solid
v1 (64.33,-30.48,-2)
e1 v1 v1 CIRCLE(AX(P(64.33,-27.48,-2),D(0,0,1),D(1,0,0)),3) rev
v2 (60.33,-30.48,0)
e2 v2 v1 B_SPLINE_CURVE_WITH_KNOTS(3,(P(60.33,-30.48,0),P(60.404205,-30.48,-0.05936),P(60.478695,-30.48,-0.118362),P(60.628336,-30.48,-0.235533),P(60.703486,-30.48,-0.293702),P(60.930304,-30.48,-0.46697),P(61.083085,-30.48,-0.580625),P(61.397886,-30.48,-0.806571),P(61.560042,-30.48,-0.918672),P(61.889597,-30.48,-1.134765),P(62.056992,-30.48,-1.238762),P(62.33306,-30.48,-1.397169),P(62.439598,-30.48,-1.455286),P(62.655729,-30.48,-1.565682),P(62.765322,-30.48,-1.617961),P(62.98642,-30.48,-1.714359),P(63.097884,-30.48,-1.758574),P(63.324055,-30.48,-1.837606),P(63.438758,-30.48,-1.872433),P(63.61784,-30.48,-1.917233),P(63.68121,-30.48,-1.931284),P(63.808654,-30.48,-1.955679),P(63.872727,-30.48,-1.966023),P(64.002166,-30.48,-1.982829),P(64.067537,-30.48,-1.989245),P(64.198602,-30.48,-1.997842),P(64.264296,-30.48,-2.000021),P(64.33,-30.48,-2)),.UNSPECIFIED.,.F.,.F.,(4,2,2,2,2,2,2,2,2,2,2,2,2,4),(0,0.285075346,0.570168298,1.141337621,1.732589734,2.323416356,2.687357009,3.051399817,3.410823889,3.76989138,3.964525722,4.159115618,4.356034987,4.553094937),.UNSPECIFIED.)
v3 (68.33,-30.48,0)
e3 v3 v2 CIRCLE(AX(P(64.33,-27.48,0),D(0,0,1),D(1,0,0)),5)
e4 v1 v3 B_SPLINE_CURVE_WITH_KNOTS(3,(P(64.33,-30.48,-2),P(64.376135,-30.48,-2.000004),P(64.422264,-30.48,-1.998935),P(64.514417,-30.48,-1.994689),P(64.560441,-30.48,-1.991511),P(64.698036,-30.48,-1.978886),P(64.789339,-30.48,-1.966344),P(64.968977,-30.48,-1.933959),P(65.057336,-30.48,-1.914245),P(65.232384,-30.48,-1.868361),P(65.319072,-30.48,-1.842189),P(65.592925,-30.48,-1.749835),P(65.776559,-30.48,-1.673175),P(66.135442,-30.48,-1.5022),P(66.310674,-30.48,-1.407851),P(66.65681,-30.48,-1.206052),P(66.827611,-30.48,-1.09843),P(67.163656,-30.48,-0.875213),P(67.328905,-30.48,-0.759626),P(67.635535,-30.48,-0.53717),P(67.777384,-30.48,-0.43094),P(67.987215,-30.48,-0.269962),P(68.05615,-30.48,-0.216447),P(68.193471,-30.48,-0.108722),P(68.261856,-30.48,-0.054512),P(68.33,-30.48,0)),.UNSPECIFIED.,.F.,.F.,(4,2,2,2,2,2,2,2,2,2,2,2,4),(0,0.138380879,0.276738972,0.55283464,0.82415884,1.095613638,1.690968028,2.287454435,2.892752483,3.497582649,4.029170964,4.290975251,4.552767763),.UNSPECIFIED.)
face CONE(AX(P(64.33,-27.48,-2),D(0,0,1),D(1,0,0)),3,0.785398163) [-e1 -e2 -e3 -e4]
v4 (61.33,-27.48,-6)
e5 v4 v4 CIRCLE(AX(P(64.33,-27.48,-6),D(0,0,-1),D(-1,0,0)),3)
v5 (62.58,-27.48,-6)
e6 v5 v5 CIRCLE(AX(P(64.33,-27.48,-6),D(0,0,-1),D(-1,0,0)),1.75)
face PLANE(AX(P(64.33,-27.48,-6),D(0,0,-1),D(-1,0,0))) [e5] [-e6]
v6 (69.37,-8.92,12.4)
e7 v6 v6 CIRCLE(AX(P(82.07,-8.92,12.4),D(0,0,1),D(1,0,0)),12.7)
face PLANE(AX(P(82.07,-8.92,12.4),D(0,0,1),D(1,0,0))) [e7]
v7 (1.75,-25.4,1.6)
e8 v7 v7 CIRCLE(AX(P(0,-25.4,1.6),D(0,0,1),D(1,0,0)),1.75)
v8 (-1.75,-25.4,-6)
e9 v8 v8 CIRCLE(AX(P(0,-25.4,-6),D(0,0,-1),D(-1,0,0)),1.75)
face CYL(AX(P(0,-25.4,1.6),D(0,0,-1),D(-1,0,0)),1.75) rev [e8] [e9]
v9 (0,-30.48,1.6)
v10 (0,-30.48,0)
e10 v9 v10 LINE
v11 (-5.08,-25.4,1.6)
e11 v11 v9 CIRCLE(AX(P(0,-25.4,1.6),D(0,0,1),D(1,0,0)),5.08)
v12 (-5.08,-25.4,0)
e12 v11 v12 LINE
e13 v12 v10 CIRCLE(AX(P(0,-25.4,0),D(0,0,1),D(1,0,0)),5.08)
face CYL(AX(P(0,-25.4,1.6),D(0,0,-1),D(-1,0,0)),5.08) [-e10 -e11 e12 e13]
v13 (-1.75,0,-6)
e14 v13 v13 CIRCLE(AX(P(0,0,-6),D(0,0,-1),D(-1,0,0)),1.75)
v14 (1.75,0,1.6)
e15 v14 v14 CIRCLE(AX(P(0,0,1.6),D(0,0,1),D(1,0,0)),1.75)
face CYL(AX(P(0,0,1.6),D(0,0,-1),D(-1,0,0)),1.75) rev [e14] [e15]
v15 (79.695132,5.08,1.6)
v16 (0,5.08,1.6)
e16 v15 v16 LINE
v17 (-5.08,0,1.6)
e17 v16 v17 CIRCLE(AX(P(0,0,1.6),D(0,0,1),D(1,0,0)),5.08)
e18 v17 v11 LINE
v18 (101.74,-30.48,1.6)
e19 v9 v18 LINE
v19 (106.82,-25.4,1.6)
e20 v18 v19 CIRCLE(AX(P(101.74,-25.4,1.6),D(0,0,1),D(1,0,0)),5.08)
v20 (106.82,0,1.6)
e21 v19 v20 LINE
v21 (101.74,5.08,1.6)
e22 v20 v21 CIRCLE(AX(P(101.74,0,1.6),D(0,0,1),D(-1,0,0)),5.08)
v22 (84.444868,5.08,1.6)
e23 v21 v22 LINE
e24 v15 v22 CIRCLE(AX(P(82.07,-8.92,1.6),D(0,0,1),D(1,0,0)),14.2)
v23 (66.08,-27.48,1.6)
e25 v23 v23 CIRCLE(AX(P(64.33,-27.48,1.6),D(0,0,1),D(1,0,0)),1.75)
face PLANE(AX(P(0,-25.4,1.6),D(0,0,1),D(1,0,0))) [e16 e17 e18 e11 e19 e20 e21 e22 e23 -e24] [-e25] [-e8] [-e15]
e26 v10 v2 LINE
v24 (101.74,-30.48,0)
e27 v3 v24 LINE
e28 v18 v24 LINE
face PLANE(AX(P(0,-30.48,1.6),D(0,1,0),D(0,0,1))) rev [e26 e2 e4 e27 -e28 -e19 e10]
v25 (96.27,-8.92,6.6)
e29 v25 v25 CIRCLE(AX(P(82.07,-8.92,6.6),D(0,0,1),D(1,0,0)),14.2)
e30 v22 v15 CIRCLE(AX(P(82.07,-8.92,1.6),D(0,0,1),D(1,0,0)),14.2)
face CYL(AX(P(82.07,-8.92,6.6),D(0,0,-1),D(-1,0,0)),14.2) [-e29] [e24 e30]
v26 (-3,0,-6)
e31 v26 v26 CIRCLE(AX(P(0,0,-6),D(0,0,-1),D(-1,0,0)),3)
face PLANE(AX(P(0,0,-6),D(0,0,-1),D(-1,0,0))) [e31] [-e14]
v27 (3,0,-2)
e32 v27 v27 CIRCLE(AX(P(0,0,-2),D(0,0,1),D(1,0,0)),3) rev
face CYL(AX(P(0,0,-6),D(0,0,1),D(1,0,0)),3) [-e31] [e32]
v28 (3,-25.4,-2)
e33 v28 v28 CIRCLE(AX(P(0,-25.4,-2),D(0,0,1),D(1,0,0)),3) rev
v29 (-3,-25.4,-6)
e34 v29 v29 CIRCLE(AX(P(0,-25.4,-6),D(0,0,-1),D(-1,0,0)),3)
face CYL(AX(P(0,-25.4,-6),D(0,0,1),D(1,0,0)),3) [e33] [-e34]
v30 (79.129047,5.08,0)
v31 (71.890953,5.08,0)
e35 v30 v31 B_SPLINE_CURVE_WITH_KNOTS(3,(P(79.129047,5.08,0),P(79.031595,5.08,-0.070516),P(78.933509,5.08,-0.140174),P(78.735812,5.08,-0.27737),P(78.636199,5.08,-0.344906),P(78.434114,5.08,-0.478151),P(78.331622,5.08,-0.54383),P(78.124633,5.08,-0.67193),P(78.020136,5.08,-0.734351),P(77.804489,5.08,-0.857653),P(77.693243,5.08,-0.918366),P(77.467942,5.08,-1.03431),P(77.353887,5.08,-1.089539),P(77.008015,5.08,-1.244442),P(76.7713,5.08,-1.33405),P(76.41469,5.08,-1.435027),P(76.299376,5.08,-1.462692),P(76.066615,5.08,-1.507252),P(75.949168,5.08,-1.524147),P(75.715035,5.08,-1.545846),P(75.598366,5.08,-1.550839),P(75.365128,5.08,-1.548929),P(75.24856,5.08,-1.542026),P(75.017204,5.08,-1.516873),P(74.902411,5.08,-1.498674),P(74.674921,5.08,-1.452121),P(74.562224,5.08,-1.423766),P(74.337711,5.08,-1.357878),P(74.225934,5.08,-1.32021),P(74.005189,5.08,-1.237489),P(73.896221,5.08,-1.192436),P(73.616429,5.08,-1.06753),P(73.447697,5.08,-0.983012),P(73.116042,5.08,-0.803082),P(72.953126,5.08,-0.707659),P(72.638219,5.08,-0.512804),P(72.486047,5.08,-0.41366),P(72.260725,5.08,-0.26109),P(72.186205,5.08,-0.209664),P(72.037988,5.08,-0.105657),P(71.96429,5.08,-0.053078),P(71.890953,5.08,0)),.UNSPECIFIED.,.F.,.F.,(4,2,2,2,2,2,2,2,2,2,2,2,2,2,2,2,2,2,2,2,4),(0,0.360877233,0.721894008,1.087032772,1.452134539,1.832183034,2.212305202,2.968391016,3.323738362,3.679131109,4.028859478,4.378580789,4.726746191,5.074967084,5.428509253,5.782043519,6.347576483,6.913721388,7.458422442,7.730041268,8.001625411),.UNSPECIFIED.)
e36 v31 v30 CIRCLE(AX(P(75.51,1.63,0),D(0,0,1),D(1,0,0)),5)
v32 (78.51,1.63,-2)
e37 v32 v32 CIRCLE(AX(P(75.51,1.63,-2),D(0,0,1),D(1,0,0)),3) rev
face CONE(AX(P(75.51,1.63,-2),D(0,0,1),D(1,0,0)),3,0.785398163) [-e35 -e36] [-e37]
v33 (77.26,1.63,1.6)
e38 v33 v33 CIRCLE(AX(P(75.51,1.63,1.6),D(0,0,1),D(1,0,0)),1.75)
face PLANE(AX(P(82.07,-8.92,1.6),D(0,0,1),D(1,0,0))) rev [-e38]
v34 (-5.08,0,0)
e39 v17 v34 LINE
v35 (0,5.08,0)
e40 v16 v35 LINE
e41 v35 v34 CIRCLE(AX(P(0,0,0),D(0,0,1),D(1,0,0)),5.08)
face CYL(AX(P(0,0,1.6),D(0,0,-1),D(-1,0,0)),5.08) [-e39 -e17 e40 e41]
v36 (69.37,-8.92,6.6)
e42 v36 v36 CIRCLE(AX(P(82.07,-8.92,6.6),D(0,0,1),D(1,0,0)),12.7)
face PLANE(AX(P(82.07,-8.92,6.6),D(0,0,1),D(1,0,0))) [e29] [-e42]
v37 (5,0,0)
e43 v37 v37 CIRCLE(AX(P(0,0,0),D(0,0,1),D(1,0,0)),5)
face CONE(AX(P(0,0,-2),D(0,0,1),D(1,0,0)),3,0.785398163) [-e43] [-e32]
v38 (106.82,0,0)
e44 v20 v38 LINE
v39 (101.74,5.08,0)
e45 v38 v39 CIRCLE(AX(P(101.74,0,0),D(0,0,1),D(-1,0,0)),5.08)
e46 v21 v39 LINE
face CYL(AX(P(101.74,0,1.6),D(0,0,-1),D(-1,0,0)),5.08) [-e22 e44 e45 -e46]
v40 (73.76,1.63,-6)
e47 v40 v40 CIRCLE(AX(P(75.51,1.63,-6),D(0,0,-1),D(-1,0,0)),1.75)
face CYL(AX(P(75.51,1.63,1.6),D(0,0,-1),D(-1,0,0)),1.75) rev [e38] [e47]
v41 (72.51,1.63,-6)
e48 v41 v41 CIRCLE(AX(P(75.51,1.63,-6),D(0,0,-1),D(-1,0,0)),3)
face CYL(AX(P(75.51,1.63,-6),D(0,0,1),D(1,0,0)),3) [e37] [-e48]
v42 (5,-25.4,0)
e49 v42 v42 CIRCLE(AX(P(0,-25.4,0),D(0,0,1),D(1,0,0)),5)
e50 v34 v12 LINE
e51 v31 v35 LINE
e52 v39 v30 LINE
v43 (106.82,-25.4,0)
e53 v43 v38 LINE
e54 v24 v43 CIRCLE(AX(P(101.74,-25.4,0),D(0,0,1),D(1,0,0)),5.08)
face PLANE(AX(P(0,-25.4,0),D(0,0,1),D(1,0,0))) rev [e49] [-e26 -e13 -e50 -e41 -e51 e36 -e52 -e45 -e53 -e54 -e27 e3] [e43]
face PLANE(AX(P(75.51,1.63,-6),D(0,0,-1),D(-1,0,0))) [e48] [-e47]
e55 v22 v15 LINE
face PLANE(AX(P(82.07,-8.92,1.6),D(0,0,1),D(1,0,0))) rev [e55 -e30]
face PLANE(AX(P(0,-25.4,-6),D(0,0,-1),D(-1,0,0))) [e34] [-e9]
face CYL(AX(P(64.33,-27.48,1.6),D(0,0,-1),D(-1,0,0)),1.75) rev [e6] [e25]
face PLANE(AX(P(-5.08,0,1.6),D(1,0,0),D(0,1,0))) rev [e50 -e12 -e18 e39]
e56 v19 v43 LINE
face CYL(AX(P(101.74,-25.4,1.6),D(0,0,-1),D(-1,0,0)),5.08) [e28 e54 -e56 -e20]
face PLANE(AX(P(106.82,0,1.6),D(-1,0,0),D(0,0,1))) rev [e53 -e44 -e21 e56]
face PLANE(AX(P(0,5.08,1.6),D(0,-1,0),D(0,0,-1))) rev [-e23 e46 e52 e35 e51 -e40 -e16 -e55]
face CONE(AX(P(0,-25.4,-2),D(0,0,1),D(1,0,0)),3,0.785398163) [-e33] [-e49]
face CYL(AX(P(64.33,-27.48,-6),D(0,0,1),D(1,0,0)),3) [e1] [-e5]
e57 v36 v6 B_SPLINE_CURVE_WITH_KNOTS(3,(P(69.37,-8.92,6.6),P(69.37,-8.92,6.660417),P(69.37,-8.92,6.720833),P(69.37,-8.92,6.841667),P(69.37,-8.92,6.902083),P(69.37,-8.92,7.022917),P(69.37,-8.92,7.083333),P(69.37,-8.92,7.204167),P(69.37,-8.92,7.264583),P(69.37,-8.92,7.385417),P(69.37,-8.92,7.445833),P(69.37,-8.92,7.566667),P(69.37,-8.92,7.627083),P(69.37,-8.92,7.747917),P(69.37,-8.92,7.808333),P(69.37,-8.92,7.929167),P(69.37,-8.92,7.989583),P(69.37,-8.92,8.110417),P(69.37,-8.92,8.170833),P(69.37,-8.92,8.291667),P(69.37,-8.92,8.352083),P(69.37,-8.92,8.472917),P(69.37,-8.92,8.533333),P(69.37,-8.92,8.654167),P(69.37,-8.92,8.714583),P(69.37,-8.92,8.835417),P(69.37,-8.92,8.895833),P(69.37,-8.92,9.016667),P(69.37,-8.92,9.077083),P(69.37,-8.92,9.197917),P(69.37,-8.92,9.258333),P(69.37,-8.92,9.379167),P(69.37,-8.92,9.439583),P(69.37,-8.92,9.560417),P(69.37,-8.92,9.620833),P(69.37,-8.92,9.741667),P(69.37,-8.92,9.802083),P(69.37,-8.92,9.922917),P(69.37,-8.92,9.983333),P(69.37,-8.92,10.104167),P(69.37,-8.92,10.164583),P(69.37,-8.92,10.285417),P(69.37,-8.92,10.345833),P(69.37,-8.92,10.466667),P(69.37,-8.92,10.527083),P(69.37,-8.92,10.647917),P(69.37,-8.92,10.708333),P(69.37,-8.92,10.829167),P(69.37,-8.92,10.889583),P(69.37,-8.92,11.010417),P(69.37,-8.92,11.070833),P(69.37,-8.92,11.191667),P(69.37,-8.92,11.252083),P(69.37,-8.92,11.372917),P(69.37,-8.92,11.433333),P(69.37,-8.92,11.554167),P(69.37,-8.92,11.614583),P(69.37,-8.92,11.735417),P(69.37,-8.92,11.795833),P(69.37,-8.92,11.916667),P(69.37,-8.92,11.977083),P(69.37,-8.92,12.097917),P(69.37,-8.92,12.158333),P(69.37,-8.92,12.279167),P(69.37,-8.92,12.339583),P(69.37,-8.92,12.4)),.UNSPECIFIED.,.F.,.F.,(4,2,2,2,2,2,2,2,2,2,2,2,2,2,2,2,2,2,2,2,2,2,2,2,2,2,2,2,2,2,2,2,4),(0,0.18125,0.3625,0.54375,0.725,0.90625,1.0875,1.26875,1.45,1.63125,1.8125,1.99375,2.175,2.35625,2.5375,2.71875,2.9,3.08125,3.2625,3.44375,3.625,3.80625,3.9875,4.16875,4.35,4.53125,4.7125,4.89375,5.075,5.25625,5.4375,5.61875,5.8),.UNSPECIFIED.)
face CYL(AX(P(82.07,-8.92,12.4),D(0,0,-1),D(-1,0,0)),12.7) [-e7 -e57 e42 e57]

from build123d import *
from build123d.topology import SkipClean

# Parameters (mm, degrees)
SKETCH1_R           = 1.75
BOSS_EXTRUDE1_DEPTH = 1.6
SKETCH2_R           = 12.7
BOSS_EXTRUDE2_DEPTH = 10.8
BOSS_EXTRUDE3_START = 6
SKETCH3_R           = 3
SKETCH3_R_2         = 1.75
BOSS_EXTRUDE3_DEPTH = 6
SKETCH4_R           = 14.2
SKETCH4_R_2         = 12.7
BOSS_EXTRUDE4_DEPTH = 5
CHAMFER1_SIZE       = 2


with BuildPart() as part:
    # Sketch1 → Boss-Extrude1 (new body)
    with BuildSketch(Plane.XY):
        with BuildLine():
            Line((0, 5.08), (101.74, 5.08))
            ThreePointArc((101.74, 5.08), (105.332102448, 3.592102448), (106.82, 0))
            Line((106.82, 0), (106.82, -25.4))
            ThreePointArc((106.82, -25.4), (105.332102448, -28.992102448), (101.74, -30.48))
            Line((101.74, -30.48), (0, -30.48))
            ThreePointArc((0, -30.48), (-3.592102448, -28.992102448), (-5.08, -25.4))
            Line((-5.08, -25.4), (-5.08, 0))
            ThreePointArc((-5.08, 0), (-3.592102448, 3.592102448), (0, 5.08))
        make_face()
        Circle(SKETCH1_R, mode=Mode.SUBTRACT)
        with Locations((0, -25.4)):
            Circle(SKETCH1_R, mode=Mode.SUBTRACT)
        with Locations((75.51, 1.63)):
            Circle(SKETCH1_R, mode=Mode.SUBTRACT)
        with Locations((64.33, -27.48)):
            Circle(SKETCH1_R, mode=Mode.SUBTRACT)
    extrude(amount=BOSS_EXTRUDE1_DEPTH)

    # Sketch2 → Boss-Extrude2 (add)
    with BuildSketch(Plane.XY.offset(1.6)):
        with Locations(Location((82.07, -8.92, 0), (0, 0, 129.761690902))):
            Circle(SKETCH2_R)
    extrude(amount=BOSS_EXTRUDE2_DEPTH)

    # Sketch3 → Boss-Extrude3 (add)
    # profile 1 of 4: a face of its own
    with SkipClean():  # the faces are left unmerged after this step: merging them gives an invalid solid
        with BuildSketch(Plane(origin=(0, 0, 0), x_dir=(-1, 0, 0), z_dir=(0, 0, -1)).offset(BOSS_EXTRUDE3_START)):
            with Locations(Location((-75.51, 1.63, 0), (0, 0, 180))):
                Circle(SKETCH3_R)
            with Locations((-75.51, 1.63)):
                Circle(SKETCH3_R_2, mode=Mode.SUBTRACT)
        # profile 2 of 4: a face of its own
        with BuildSketch(Plane(origin=(0, 0, 0), x_dir=(-1, 0, 0), z_dir=(0, 0, -1)).offset(BOSS_EXTRUDE3_START)):
            with Locations(Location((-64.33, -27.48, 0), (0, 0, 270))):
                Circle(SKETCH3_R)
            with Locations((-64.33, -27.48)):
                Circle(SKETCH3_R_2, mode=Mode.SUBTRACT)
        # profile 3 of 4: a face of its own
        with BuildSketch(Plane(origin=(0, 0, 0), x_dir=(-1, 0, 0), z_dir=(0, 0, -1)).offset(BOSS_EXTRUDE3_START)):
            with Locations(Location((0, -25.4, 0), (0, 0, 180))):
                Circle(SKETCH3_R)
            with Locations((0, -25.4)):
                Circle(SKETCH3_R_2, mode=Mode.SUBTRACT)
        # profile 4 of 4: a face of its own
        with BuildSketch(Plane(origin=(0, 0, 0), x_dir=(-1, 0, 0), z_dir=(0, 0, -1)).offset(BOSS_EXTRUDE3_START)):
            with Locations(Location((0, 0, 0), (0, 0, 180))):
                Circle(SKETCH3_R)
            Circle(SKETCH3_R_2, mode=Mode.SUBTRACT)
        extrude(amount=-BOSS_EXTRUDE3_DEPTH)

    # Sketch4 → Boss-Extrude4 (add)
    with SkipClean():  # the faces are left unmerged after this step: merging them gives an invalid solid
        with BuildSketch(Plane.XY.offset(1.6)):
            with Locations(Location((82.07, -8.92, 0), (0, 0, 99.627632683))):
                Circle(SKETCH4_R)
            with Locations(Location((82.07, -8.92, 0), (0, 0, 180))):
                Circle(SKETCH4_R_2, mode=Mode.SUBTRACT)
        extrude(amount=BOSS_EXTRUDE4_DEPTH)

    # Chamfer1
    # the kernel refuses this chamfer: 2 mm, written as the material it adds along each edge
    with BuildSketch(Plane(origin=(75.51, 1.63, 0), x_dir=(1, 0, 0), z_dir=(0, 1, 0))) as chamfer1_piece_1_section:
        Polygon((3 + CHAMFER1_SIZE, 0), (3, CHAMFER1_SIZE), (3, 0), align=None)
    chamfer1_piece_1 = revolve(axis=Axis((75.51, 1.63, 0), (0, 0, -1)), mode=Mode.PRIVATE)
    chamfer1_piece_1 = split(chamfer1_piece_1, bisect_by=Plane(origin=(71.534469878, 5.08, -0.975530122), z_dir=(0, -1, 0)), keep=Keep.TOP, mode=Mode.PRIVATE)
    add(chamfer1_piece_1)
    with BuildSketch(Plane(origin=(64.33, -27.48, 0), x_dir=(0, -1, 0), z_dir=(1, 0, 0))) as chamfer1_piece_2_section:
        Polygon((3 + CHAMFER1_SIZE, 0), (3, CHAMFER1_SIZE), (3, 0), align=None)
    chamfer1_piece_2 = revolve(axis=Axis((64.33, -27.48, 0), (0, 0, -1)), mode=Mode.PRIVATE)
    chamfer1_piece_2 = split(chamfer1_piece_2, bisect_by=Plane(origin=(64.33, -30.48, -0.976321061), z_dir=(0, 1, 0)), keep=Keep.TOP, mode=Mode.PRIVATE)
    add(chamfer1_piece_2)
    with BuildSketch(Plane(origin=(0, -25.4, 0), x_dir=(1, 0, 0), z_dir=(0, 1, 0))) as chamfer1_piece_3:
        Polygon((3 + CHAMFER1_SIZE, 0), (3, CHAMFER1_SIZE), (3, 0), align=None)
    revolve(axis=Axis((0, -25.4, 0), (0, 0, -1)))
    with BuildSketch(Plane(origin=(0, 0, 0), x_dir=(1, 0, 0), z_dir=(0, 1, 0))) as chamfer1_piece_4:
        Polygon((3 + CHAMFER1_SIZE, 0), (3, CHAMFER1_SIZE), (3, 0), align=None)
    revolve(axis=Axis((0, 0, 0), (0, 0, -1)))


solid = part.part
